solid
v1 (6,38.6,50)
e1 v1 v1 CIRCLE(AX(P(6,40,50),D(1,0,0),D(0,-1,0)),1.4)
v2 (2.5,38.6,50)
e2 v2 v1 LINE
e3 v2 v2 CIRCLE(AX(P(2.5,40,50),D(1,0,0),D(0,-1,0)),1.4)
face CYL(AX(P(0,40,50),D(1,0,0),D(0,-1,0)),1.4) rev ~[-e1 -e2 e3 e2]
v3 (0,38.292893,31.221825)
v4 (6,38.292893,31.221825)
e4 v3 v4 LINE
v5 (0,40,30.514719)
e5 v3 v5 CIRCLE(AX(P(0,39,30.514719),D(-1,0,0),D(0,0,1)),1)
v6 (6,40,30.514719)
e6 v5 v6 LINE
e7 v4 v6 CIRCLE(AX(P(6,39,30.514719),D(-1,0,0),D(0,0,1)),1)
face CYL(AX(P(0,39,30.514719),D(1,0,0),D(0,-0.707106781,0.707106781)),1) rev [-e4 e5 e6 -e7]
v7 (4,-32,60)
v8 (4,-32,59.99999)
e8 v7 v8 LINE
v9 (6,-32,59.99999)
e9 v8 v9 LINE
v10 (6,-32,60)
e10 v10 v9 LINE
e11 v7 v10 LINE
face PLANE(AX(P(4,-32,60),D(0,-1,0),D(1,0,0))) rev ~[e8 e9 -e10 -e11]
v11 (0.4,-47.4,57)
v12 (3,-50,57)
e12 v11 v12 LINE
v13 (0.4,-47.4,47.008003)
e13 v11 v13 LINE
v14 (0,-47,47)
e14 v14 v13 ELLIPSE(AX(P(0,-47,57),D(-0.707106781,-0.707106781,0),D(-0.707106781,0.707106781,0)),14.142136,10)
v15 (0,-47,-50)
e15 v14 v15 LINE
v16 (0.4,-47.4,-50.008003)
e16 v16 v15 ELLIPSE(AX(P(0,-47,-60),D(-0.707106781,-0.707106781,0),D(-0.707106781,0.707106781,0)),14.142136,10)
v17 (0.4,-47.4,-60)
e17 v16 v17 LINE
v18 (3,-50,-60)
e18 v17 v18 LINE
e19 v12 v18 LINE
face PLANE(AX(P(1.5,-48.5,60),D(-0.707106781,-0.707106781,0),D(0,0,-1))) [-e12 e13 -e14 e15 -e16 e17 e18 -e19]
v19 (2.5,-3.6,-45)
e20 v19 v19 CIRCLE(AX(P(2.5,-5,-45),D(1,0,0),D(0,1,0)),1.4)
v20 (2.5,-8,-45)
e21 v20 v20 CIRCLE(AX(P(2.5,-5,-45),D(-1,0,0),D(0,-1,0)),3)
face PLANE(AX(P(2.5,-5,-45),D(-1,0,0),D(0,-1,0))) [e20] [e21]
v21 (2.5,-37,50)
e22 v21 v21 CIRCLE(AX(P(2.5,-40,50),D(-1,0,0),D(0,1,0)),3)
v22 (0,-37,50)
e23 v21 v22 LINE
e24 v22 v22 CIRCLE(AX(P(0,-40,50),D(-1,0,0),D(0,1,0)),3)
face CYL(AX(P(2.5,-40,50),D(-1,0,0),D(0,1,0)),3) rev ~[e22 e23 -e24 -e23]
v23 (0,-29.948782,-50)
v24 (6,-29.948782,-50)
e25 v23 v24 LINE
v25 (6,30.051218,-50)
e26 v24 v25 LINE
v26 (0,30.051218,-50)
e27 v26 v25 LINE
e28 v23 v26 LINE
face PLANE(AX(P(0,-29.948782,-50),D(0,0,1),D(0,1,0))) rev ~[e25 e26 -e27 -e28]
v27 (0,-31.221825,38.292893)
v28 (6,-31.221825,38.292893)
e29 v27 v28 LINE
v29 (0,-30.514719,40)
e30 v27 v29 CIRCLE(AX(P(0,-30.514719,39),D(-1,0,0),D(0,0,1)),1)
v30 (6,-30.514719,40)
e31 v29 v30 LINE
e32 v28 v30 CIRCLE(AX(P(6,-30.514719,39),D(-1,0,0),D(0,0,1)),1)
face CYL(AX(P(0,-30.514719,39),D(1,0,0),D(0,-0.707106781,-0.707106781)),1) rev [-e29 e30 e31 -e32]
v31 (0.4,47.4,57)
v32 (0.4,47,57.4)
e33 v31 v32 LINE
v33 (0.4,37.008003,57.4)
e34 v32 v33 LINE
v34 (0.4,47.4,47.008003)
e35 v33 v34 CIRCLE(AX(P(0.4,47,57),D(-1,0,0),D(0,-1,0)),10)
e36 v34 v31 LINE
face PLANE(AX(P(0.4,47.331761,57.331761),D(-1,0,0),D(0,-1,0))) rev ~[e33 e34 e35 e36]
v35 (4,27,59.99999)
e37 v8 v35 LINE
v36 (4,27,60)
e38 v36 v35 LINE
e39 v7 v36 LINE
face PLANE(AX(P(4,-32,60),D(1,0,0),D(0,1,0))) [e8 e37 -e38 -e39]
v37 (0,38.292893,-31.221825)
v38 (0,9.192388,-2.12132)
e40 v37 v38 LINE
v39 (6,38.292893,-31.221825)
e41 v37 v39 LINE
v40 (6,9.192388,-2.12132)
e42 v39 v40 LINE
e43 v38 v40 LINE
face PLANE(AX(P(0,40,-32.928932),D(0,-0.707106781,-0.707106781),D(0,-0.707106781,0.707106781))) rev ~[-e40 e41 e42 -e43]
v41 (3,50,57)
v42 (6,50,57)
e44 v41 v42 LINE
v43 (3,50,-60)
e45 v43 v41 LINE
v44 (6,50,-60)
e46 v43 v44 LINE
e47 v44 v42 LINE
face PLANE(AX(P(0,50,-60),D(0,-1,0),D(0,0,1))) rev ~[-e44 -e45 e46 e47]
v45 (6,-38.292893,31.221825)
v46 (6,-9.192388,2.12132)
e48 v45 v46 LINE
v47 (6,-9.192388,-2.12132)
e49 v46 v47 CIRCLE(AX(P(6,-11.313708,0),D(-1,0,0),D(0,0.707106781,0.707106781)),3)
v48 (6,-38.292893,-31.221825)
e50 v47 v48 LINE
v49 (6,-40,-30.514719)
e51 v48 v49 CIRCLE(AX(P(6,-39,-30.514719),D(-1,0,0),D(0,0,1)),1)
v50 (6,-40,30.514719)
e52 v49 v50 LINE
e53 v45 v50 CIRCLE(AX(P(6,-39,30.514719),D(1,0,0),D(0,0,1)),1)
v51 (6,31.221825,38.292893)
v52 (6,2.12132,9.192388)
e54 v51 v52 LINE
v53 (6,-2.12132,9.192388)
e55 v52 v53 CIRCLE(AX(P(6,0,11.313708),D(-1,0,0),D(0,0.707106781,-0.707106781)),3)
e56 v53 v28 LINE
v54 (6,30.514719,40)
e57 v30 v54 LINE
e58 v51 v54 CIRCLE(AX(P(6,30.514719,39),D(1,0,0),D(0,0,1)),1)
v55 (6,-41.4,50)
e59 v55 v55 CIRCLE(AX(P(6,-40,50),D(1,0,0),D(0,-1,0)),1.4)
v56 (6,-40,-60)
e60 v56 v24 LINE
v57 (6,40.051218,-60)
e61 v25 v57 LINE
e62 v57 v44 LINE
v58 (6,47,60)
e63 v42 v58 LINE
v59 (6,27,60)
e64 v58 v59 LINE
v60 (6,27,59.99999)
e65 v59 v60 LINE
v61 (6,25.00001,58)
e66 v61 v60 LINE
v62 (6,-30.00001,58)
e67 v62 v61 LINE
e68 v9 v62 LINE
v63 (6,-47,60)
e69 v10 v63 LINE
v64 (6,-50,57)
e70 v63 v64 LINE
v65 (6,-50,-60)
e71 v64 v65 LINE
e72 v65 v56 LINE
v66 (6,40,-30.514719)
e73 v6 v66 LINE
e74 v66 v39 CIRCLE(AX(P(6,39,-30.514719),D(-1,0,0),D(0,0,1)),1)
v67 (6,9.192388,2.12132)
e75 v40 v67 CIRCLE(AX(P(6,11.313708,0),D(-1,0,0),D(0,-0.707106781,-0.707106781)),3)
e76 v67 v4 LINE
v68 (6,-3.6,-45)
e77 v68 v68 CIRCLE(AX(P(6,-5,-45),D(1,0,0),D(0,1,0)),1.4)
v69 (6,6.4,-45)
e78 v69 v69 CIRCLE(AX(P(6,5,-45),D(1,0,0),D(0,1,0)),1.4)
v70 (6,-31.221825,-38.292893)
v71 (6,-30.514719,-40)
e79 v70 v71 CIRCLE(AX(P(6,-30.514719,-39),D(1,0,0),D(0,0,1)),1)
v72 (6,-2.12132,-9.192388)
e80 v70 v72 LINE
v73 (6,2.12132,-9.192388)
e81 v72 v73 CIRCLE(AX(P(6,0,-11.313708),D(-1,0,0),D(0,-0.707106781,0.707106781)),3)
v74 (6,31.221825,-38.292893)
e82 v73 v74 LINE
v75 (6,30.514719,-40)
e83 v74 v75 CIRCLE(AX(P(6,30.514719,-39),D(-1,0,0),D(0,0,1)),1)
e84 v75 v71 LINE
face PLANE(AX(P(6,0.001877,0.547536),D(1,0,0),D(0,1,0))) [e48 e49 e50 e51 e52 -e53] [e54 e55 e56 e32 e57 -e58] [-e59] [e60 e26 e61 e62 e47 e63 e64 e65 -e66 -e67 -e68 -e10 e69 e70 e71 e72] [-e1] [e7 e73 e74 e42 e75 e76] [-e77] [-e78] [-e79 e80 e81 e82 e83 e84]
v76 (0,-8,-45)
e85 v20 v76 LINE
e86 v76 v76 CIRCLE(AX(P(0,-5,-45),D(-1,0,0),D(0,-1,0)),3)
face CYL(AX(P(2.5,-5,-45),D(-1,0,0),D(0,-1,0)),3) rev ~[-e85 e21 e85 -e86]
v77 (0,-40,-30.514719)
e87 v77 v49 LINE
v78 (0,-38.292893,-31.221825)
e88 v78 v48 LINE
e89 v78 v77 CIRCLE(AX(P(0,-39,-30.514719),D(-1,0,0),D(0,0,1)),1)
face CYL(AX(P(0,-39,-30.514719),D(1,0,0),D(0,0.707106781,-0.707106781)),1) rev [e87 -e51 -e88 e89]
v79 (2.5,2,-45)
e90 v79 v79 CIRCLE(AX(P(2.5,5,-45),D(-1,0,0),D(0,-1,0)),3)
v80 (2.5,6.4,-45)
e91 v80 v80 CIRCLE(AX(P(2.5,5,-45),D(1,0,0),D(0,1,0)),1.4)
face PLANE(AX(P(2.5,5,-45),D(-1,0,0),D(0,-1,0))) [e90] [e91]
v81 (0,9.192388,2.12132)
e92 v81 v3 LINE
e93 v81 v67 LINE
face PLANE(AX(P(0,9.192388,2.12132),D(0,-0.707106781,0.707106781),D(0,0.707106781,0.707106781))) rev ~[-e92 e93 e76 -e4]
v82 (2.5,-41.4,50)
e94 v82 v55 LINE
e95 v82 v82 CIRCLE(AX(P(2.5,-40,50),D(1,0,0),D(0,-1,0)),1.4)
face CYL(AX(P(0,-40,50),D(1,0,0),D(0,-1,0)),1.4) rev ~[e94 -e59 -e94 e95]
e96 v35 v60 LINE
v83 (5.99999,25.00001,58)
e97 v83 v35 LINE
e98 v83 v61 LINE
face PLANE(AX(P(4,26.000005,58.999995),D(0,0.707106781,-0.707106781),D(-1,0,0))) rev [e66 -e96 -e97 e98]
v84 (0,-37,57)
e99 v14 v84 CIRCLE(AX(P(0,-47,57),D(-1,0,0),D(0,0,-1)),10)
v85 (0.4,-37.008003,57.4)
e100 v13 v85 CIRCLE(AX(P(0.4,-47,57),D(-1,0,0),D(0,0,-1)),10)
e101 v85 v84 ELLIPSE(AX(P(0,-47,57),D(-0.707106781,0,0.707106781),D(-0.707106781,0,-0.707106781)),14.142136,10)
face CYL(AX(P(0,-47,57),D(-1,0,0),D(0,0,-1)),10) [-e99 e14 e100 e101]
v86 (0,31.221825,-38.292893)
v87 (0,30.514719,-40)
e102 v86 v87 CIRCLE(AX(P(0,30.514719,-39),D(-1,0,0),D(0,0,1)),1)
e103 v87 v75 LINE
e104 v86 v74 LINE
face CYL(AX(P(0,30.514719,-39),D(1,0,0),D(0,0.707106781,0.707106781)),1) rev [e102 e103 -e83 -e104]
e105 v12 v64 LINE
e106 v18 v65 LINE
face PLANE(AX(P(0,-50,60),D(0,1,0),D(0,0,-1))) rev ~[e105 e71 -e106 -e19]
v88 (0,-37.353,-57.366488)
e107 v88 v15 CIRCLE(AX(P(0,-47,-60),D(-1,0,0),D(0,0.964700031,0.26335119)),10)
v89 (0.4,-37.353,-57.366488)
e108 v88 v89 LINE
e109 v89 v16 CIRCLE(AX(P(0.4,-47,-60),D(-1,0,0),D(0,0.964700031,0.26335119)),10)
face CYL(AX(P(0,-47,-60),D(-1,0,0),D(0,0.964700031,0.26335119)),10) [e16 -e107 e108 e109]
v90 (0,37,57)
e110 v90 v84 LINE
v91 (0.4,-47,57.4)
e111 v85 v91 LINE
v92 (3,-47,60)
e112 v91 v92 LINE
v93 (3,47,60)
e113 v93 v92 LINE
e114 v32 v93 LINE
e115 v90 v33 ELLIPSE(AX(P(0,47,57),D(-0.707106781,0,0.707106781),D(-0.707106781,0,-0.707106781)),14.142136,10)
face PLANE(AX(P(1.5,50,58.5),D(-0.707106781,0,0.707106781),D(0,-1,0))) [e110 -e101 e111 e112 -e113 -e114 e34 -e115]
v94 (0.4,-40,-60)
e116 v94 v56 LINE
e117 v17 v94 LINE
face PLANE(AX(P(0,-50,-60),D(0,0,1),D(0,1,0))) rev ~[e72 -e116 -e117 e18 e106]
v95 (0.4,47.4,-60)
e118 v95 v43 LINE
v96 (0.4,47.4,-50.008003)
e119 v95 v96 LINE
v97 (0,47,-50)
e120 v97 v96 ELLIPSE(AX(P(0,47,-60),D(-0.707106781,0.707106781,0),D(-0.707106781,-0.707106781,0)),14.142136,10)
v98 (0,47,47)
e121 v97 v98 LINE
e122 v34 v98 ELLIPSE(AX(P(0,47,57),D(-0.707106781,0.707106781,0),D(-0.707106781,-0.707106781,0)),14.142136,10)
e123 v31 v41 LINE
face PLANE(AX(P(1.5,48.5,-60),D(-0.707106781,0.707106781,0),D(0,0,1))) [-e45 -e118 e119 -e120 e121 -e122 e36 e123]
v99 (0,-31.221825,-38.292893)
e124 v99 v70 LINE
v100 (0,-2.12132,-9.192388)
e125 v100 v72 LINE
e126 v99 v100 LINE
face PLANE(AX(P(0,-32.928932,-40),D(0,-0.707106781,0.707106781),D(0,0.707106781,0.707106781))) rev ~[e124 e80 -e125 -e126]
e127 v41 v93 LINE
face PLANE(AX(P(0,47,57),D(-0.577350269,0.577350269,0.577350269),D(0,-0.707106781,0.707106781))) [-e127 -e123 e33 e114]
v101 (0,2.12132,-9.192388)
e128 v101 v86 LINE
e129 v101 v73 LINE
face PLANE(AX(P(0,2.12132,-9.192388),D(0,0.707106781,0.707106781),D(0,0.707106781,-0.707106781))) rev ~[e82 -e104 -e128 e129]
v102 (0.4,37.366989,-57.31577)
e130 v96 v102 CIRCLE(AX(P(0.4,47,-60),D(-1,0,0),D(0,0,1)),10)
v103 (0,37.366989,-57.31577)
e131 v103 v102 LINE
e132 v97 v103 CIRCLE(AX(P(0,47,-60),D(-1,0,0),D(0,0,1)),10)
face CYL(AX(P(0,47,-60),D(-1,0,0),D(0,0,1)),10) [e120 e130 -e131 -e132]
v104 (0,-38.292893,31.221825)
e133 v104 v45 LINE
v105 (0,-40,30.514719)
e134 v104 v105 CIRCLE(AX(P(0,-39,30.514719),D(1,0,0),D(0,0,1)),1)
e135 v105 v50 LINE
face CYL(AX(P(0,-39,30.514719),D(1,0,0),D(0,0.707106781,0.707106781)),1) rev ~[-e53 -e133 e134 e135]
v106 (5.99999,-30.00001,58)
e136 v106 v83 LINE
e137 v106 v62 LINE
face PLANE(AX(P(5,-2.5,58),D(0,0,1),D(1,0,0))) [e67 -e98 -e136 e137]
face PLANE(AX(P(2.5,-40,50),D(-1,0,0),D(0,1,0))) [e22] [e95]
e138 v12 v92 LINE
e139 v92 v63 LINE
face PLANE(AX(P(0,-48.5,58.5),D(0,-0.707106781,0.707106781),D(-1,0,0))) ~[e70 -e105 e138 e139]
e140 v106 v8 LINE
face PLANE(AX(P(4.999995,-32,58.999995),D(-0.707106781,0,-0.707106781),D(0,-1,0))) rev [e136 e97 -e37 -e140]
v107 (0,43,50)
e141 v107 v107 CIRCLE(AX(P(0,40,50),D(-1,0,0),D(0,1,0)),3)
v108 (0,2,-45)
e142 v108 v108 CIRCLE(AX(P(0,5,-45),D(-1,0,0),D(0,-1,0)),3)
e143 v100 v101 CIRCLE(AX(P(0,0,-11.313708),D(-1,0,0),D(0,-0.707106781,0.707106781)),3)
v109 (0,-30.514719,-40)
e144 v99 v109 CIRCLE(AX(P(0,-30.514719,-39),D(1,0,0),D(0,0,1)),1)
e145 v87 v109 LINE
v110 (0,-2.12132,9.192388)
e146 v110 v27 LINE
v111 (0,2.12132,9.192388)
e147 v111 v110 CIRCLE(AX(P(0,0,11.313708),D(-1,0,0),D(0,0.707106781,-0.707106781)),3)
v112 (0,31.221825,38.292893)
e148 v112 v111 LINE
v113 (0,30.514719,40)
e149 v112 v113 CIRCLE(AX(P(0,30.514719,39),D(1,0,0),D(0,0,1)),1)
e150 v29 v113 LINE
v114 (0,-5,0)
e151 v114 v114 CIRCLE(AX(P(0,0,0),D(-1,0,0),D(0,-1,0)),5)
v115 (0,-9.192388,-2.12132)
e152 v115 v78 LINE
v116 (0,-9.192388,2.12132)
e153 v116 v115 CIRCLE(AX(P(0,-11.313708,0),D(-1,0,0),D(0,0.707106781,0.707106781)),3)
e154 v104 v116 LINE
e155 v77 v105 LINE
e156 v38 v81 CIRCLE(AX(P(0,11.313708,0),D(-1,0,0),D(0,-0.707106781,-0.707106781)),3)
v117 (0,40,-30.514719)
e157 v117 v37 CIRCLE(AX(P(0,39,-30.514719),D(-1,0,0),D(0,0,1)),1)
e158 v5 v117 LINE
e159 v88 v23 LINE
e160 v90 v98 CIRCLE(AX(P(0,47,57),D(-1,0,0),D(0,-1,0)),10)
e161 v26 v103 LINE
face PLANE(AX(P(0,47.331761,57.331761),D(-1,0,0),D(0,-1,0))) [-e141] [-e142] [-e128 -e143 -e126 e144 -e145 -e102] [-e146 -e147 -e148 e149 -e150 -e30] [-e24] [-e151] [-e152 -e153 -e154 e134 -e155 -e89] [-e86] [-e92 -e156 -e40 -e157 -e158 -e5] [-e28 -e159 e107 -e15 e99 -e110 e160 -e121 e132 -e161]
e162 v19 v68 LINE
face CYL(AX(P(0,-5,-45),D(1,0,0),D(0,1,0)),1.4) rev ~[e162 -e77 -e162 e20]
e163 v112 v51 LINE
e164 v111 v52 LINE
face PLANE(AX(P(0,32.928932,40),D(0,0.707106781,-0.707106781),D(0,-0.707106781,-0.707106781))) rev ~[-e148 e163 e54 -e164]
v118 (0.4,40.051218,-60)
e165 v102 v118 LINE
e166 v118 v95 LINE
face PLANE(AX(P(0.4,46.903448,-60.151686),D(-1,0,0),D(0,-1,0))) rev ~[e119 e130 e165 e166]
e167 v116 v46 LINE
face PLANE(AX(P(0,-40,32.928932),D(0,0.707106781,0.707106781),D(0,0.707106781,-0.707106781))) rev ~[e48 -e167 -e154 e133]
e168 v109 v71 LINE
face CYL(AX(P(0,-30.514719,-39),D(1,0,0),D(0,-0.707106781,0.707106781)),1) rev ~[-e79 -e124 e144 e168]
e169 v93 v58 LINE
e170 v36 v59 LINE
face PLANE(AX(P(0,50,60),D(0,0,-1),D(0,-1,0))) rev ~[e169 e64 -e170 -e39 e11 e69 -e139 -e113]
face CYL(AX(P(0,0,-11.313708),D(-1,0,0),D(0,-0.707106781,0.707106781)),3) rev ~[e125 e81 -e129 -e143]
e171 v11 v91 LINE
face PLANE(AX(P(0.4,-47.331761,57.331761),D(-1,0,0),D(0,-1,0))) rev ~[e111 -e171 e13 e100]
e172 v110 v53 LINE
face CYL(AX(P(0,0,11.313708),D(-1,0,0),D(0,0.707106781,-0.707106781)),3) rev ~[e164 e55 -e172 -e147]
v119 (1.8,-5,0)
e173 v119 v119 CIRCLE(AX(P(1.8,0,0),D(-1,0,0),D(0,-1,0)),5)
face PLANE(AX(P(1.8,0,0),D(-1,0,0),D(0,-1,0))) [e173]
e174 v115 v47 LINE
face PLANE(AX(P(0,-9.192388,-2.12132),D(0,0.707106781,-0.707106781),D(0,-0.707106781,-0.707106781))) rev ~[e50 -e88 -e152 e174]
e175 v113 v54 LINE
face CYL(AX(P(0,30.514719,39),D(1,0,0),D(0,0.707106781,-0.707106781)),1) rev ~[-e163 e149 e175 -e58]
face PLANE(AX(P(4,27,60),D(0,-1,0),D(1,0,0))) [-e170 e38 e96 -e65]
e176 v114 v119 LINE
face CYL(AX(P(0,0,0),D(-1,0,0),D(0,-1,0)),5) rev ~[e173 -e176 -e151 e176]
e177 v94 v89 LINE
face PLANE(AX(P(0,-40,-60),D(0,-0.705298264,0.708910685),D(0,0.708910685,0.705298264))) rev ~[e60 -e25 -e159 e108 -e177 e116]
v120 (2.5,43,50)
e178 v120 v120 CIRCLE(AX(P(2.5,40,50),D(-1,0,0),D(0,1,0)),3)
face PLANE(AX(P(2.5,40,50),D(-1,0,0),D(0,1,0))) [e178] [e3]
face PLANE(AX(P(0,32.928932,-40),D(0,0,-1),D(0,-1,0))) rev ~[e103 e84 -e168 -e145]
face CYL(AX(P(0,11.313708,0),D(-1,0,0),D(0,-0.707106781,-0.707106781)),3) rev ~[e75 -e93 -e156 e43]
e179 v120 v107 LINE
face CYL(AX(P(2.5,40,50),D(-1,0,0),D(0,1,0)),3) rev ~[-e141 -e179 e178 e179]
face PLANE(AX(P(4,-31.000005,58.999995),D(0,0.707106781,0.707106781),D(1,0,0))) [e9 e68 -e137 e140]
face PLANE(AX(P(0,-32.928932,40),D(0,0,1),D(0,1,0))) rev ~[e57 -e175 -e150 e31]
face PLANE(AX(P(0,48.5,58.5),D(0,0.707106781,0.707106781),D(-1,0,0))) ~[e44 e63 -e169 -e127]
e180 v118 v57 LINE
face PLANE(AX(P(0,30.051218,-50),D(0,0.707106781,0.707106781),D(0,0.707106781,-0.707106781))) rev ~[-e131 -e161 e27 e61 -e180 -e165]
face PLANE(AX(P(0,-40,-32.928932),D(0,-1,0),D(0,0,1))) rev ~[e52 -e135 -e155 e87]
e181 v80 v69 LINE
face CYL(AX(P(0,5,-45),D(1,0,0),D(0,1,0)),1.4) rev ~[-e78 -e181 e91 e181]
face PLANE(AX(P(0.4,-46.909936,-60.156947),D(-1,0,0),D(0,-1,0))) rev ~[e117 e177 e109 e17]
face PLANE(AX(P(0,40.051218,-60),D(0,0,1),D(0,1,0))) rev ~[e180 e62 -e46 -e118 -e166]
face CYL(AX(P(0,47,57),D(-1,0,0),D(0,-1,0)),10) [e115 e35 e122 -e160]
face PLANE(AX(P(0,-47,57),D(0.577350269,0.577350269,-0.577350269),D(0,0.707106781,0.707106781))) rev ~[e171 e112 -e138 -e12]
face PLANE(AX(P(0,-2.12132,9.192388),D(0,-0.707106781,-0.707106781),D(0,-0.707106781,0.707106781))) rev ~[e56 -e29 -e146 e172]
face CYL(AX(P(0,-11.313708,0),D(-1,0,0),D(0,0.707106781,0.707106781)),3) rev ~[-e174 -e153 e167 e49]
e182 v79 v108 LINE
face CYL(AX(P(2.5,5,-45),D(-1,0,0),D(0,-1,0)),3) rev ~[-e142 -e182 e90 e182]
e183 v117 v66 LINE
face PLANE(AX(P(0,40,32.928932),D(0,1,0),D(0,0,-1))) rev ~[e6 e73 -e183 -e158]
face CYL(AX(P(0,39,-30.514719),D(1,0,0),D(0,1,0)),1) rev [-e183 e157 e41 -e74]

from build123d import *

# Parameters (mm, degrees)
F1_DEPTH       = 6
F2_R           = 1
F3_D           = 2.8
F3_CBORE_D     = 6
F3_CBORE_DEPTH = 2.5
F4_R           = 5
F5_DEPTH       = 1.8
F7_D           = 2.8
F7_CBORE_D     = 6
F7_CBORE_DEPTH = 2.5
F8_SIZE        = 3
F10_DEPTH      = 0.4
F11_W          = 2
F11_H          = 59
F12_DEPTH      = 2
F13_SIZE       = 1.99999


# Not quite as in the source:
# - a fillet or chamfer is up to 0.001 mm smaller than in the source, because OpenCascade refuses the exact size


with BuildPart() as f1:
    # F0 (on Right) → F1 (new body)
    with BuildSketch(Plane.YZ):
        Polygon((40.0512183458, -60), (50, -60), (50, 60), (-50, 60), (-50, -60), (-40, -60), (-29.9487816542, -50), (30.0512183458, -50), align=None)
        with BuildLine():
            Line((2.1213203436, -9.1923881554), (32.9289321881, -40))
            Line((32.9289321881, -40), (-32.9289321881, -40))
            Line((-32.9289321881, -40), (-2.1213203436, -9.1923881554))
            ThreePointArc((-2.1213203436, -9.1923881554), (0, -8.313708499), (2.1213203436, -9.1923881554))
        make_face(mode=Mode.SUBTRACT)
        with BuildLine():
            Line((-9.1923881554, -2.1213203436), (-40, -32.9289321881))
            Line((-40, -32.9289321881), (-40, 32.9289321881))
            Line((-40, 32.9289321881), (-9.1923881554, 2.1213203436))
            ThreePointArc((-9.1923881554, 2.1213203436), (-8.313708499, 0), (-9.1923881554, -2.1213203436))
        make_face(mode=Mode.SUBTRACT)
        with BuildLine():
            Line((40, 32.9289321881), (40, -32.9289321881))
            Line((40, -32.9289321881), (9.1923881554, -2.1213203436))
            ThreePointArc((9.1923881554, -2.1213203436), (8.313708499, 0), (9.1923881554, 2.1213203436))
            Line((9.1923881554, 2.1213203436), (40, 32.9289321881))
        make_face(mode=Mode.SUBTRACT)
        with BuildLine():
            Line((-32.9289321881, 40), (32.9289321881, 40))
            Line((32.9289321881, 40), (2.1213203436, 9.1923881554))
            ThreePointArc((2.1213203436, 9.1923881554), (0, 8.313708499), (-2.1213203436, 9.1923881554))
            Line((-2.1213203436, 9.1923881554), (-32.9289321881, 40))
        make_face(mode=Mode.SUBTRACT)
    extrude(amount=F1_DEPTH)

    # F2
    f2_edges = [f1.edges().sort_by_distance(p)[0] for p in [
        (3, -32.928932, 40),
        (3, 32.928932, 40),
        (3, -40, 32.928932),
        (3, -40, -32.928932),
        (3, -32.928932, -40),
        (3, 40, 32.928932),
        (3, 40, -32.928932),
        (3, 32.928932, -40),
    ]]
    fillet(f2_edges, radius=F2_R)

    # F3 (through all)
    with Locations(Plane(origin=(0, 0, 0), x_dir=(0, 1, 0), z_dir=(-1, 0, 0))):
        with Locations((-40, -50), (40, -50)):
            CounterBoreHole(F3_D / 2, F3_CBORE_D / 2, F3_CBORE_DEPTH)

    # F4 (on face) → F5 (cut)
    with BuildSketch(Plane(origin=(0, 0, 0), x_dir=(0, -1, 0), z_dir=(-1, 0, 0))):
        Circle(F4_R)
    extrude(amount=-F5_DEPTH, mode=Mode.SUBTRACT)

    # F7 (through all)
    with Locations(Plane(origin=(0, 0, 0), x_dir=(0, -1, 0), z_dir=(-1, 0, 0))):
        with Locations((-5, -45), (5, -45)):
            CounterBoreHole(F7_D / 2, F7_CBORE_D / 2, F7_CBORE_DEPTH)

    # F8
    f8_edges = [f1.edges().sort_by_distance(p)[0] for p in [
        (3, -50, 60),
        (3, 50, 60),
        (0, -50, 0),
        (0, 50, 0),
        (0, 0, 60),
    ]]
    chamfer(f8_edges, length=F8_SIZE)

    # F9 (on face) → F10 (join)
    with BuildSketch(Plane(origin=(0, 0, 0), x_dir=(0, -1, 0), z_dir=(-1, 0, 0))):
        with BuildLine():
            Line((-47, 57), (-37, 57))
            ThreePointArc((-37, 57), (-54.0710678119, 64.0710678119), (-47, 47))
            Line((-47, 47), (-47, 57))
        make_face()
        with BuildLine():
            ThreePointArc((47, 47), (54.0710678119, 64.0710678119), (37, 57))
            Line((37, 57), (47, 57))
            Line((47, 57), (47, 47))
        make_face()
        with BuildLine():
            Line((-47, -60), (-47, -50))
            ThreePointArc((-47, -50), (-53.0480452096, -67.9637396456), (-37.3669885172, -57.3157701715))
            Line((-37.3669885172, -57.3157701715), (-40.0512183458, -60))
            Line((-40.0512183458, -60), (-47, -60))
        make_face()
        with BuildLine():
            ThreePointArc((37.3529996858, -57.3664880981), (53.0689735945, -67.9478021811), (47, -50))
            Line((47, -50), (47, -60))
            Line((47, -60), (40, -60))
            Line((40, -60), (37.3529996858, -57.3664880981))
        make_face()
    extrude(amount=-F10_DEPTH)

    # F11 (on face) → F12 (cut)
    with BuildSketch(Plane.XY.offset(60)):
        with Locations((5, -2.5)):
            Rectangle(F11_W, F11_H)
    extrude(amount=-F12_DEPTH, mode=Mode.SUBTRACT)

    # F13 (size 2 in the source; OpenCascade refuses exactly that, so slightly less here)
    f13_edges = [f1.edges().sort_by_distance(p)[0] for p in [
        (4, -2.5, 58),
        (5, 27, 58),
        (5, -32, 58),
    ]]
    chamfer(f13_edges, length=F13_SIZE)


solid = f1.part
